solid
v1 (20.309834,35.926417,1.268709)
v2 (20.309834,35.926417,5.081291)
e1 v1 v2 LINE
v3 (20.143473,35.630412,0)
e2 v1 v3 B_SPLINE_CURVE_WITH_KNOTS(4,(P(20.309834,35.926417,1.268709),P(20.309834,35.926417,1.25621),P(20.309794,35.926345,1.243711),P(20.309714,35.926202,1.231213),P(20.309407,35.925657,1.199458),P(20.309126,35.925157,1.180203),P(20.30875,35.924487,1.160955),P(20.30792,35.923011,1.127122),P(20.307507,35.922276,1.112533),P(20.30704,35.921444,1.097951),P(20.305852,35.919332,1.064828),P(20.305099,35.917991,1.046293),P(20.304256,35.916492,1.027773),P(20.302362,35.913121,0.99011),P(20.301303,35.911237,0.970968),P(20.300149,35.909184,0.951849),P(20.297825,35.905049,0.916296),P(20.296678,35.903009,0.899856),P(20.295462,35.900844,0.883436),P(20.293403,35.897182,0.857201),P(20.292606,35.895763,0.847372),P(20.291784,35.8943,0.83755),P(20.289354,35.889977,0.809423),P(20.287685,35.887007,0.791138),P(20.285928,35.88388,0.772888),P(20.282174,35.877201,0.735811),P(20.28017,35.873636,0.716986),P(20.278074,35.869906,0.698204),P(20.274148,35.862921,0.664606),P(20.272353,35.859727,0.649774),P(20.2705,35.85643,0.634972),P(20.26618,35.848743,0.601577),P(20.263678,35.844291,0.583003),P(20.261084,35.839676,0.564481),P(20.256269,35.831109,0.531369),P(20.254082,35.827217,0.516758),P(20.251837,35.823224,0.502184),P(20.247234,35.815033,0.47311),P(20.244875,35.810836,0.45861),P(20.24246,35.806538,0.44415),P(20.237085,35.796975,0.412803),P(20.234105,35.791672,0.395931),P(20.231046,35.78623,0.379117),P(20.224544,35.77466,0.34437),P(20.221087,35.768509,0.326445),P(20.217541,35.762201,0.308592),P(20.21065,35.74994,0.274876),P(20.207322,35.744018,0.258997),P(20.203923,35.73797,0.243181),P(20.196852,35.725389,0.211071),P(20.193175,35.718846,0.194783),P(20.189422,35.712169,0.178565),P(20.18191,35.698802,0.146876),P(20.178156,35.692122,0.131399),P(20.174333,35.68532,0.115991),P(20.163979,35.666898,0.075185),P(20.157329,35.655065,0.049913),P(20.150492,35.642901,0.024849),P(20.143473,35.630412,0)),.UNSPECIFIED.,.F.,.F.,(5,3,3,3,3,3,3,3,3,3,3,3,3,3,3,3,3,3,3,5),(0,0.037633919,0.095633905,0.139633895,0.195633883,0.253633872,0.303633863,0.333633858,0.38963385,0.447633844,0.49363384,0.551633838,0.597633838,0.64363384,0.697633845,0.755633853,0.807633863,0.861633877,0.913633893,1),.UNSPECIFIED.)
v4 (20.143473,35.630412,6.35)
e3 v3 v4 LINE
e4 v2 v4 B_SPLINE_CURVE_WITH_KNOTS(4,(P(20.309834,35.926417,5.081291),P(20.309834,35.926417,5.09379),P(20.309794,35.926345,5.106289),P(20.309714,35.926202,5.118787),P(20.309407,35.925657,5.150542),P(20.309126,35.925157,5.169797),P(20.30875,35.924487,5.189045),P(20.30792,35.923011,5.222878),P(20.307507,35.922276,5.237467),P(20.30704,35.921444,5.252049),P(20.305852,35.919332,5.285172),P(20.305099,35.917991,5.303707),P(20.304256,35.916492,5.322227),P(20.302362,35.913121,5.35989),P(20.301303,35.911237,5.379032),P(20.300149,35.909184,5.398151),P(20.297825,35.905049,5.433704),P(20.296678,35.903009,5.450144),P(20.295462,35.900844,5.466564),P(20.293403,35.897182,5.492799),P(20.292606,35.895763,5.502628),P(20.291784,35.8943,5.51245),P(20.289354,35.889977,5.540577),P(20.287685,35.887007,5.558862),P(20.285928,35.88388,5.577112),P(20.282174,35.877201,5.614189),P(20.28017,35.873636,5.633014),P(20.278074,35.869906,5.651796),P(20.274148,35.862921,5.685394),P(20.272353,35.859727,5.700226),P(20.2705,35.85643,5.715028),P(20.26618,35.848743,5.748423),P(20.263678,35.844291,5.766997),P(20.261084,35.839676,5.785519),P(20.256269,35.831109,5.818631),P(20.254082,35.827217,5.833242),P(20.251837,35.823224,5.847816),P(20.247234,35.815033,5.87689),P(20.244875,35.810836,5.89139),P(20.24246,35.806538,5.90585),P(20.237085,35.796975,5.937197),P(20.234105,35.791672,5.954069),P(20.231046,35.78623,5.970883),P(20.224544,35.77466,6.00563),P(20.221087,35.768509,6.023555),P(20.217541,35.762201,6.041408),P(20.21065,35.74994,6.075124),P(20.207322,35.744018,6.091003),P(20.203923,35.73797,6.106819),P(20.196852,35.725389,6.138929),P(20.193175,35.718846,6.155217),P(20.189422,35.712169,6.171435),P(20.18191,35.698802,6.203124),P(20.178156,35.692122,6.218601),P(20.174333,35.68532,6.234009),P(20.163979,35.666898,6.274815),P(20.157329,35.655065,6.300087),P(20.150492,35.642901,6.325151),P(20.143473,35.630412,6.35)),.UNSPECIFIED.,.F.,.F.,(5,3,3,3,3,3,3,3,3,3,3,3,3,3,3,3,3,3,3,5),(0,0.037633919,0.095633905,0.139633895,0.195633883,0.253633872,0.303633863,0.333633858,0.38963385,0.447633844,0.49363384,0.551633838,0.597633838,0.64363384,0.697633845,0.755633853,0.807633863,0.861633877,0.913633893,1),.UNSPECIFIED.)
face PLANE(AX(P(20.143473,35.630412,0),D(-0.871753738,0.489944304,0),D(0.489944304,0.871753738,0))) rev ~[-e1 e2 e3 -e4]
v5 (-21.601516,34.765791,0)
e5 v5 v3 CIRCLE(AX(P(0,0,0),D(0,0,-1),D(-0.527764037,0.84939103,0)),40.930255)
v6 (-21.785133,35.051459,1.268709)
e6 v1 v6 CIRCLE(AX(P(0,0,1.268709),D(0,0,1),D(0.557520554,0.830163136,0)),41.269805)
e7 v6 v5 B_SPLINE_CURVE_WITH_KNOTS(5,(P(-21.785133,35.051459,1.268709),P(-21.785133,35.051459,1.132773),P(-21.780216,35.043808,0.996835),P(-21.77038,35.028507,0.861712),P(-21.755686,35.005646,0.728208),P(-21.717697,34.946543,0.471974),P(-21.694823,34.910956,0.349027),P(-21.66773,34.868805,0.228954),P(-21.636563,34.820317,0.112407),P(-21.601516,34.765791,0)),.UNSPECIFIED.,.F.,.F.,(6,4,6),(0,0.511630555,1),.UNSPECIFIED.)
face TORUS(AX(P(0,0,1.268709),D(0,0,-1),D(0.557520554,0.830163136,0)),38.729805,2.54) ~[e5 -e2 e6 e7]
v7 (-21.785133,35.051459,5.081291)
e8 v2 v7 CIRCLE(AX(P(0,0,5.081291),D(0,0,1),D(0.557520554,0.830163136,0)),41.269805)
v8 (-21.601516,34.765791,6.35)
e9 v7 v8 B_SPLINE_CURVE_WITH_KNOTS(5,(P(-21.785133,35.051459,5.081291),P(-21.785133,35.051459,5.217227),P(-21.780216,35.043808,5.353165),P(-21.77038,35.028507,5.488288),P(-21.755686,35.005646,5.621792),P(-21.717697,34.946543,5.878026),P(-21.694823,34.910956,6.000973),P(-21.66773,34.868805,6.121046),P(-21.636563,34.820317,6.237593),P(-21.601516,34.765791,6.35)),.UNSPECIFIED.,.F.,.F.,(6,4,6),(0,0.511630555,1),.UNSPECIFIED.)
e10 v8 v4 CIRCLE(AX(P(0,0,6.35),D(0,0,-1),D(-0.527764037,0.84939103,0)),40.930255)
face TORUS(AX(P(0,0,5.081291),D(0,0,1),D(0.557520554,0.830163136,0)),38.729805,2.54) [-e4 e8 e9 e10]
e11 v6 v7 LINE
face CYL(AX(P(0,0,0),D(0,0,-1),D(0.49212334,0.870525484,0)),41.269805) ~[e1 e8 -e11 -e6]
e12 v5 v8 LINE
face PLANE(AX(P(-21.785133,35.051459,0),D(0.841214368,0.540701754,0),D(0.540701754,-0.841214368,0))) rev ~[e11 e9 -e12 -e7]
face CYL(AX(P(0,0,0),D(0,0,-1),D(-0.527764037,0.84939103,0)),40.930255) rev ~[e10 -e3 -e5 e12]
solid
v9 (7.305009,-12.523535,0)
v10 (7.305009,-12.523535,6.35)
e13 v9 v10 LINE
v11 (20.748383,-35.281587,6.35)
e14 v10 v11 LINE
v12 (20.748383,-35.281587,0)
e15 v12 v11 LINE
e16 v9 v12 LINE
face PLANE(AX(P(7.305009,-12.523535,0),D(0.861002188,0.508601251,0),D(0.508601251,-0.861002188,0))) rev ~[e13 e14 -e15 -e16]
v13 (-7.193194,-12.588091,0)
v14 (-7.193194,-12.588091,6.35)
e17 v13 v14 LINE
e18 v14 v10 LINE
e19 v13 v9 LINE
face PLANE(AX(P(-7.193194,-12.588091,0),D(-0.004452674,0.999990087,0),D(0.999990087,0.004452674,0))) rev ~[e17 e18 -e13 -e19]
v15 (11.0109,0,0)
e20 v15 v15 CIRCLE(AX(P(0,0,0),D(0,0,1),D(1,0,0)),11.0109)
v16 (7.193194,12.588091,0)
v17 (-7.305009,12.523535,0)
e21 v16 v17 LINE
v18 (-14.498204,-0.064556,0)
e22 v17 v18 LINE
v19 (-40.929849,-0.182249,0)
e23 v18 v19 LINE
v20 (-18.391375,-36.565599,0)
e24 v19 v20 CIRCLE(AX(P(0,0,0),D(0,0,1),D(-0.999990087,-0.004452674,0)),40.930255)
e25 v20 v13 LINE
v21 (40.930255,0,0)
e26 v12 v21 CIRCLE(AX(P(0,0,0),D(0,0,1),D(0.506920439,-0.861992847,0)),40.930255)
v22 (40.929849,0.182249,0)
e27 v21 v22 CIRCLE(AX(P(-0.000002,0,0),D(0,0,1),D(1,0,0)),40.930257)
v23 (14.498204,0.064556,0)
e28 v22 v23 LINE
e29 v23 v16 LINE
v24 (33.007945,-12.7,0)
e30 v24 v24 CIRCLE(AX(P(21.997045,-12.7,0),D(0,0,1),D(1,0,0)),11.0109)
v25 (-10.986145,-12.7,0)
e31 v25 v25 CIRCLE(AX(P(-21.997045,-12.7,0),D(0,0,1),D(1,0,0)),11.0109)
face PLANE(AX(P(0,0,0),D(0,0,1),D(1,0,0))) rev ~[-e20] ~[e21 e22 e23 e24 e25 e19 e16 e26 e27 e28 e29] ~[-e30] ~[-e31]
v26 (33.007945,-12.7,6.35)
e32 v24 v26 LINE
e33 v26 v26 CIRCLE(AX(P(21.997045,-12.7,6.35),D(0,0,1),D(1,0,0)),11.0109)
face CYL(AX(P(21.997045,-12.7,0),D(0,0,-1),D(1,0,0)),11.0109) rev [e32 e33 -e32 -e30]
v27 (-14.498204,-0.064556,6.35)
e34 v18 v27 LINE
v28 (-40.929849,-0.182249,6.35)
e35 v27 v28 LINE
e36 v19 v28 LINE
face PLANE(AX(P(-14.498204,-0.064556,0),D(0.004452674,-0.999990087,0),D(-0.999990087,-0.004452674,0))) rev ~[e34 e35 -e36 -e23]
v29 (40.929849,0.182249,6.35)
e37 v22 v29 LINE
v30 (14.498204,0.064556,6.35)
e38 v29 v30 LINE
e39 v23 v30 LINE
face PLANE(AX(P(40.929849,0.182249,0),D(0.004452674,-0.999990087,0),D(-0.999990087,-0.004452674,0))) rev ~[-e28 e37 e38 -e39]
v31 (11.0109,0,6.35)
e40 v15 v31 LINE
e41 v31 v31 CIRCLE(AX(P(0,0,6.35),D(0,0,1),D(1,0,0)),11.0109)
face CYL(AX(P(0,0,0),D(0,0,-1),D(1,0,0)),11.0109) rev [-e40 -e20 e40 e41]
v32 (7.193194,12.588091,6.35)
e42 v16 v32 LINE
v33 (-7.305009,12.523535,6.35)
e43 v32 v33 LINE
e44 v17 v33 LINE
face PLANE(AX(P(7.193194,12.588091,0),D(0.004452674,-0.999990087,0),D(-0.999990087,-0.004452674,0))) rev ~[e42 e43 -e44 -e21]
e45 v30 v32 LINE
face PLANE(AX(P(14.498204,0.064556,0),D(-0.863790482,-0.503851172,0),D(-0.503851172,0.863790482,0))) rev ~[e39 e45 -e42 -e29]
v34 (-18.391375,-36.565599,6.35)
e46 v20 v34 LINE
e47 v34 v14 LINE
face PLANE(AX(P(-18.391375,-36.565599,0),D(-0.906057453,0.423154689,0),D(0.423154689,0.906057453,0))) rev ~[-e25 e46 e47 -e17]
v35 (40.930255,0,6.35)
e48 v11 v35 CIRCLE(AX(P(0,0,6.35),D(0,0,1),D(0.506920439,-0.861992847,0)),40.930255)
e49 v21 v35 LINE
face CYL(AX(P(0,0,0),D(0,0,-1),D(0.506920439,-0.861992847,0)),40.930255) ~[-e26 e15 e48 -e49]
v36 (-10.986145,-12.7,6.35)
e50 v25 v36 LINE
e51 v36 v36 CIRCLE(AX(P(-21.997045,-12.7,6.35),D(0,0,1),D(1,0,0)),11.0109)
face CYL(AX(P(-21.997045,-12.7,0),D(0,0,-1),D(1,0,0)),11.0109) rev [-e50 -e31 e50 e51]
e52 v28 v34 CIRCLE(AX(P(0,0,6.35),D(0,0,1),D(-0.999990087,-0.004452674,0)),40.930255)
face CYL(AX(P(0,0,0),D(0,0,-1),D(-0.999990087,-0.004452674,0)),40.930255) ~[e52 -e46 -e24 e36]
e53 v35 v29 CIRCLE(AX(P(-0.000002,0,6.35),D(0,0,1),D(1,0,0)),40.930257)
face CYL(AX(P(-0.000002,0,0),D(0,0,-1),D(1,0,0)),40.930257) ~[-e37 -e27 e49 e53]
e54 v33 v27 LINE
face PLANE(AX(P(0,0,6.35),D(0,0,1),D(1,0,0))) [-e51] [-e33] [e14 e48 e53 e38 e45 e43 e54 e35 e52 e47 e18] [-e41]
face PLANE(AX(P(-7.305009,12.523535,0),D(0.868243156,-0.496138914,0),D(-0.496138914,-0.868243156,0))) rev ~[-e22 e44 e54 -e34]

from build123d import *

# Parameters (mm, degrees)
F0_R        = 11.0109
F1_DEPTH    = 6.35
F2_T2_ANGLE = 70.1504817672
F2_T4_ANGLE = 70.1504817672


# Not quite as in the source:
# - a fillet or chamfer that OpenCascade refuses, or shapes differently, is made with other operations: its cross-section is extruded or revolved along the edge and cut away or added


with BuildPart() as f1:
    # F0 (on Top) → F1 (new body)
    with BuildSketch(Plane.XY):
        Polygon((14.4982038565, 0.0645564188), (7.1931944296, 12.5880910584), (-7.3050094269, 12.5235346396), (-14.4982038565, -0.0645564188), (-7.1931944296, -12.5880910584), (7.3050094269, -12.5235346396), align=None)
        Circle(F0_R, mode=Mode.SUBTRACT)
        with BuildLine():
            Line((-14.4982038565, -0.0645564188), (-40.9298487578, -0.1822490898))
            ThreePointArc((-40.9298487578, -0.1822490898), (-34.7949557319, -21.55450741), (-18.3913751147, -36.565599345))
            Line((-18.3913751147, -36.565599345), (-7.1931944296, -12.5880910584))
            Line((-7.1931944296, -12.5880910584), (-14.4982038565, -0.0645564188))
        make_face()
        with Locations((-21.9970452561, -12.7)):
            Circle(F0_R, mode=Mode.SUBTRACT)
        with BuildLine():
            ThreePointArc((40.9302545077, 0), (40.9301530701, 0.0911247708), (40.9298487578, 0.1822490898))
            Line((40.9298487578, 0.1822490898), (14.4982038565, 0.0645564188))
            Line((14.4982038565, 0.0645564188), (7.3050094269, -12.5235346396))
            Line((7.3050094269, -12.5235346396), (20.7483825964, -35.2815866098))
            ThreePointArc((20.7483825964, -35.2815866098), (35.5283148655, -20.3230060987), (40.9302545077, 0))
        make_face()
        with Locations((21.9970452561, -12.7)):
            Circle(F0_R, mode=Mode.SUBTRACT)
    extrude(amount=F1_DEPTH)


with BuildPart() as f1b:
    # F0 (on Top) → F1, piece 2 (new body)
    with BuildSketch(Plane.XY):
        with BuildLine():
            Line((20.1434729417, 35.6304116159), (20.3098342556, 35.9264168886))
            ThreePointArc((20.3098342556, 35.9264168886), (-0.8576214797, 41.2608929052), (-21.7851331782, 35.0514588904))
            Line((-21.7851331782, 35.0514588904), (-21.6015163476, 34.7657910244))
            ThreePointArc((-21.6015163476, 34.7657910244), (-0.8475640596, 40.921478092), (20.1434729417, 35.6304116159))
        make_face()
    extrude(amount=F1_DEPTH)

    # F2: fillet of radius 2.54 on 2 edges, made by hand

    # F2_s1 → F2_t2 (revolve, cut)
    with BuildSketch(Plane(origin=(0, 0, 0), x_dir=(0, 0, 1), z_dir=(0.8301631357, -0.5575205541, 0))):
        with BuildLine():
            ThreePointArc((1.2687086353, -41.2698049176), (0.6120283322, -41.1834493457), (0, -40.9302545077))
            Line((0, -40.9302545077), (0, -41.2698049176))
            Line((0, -41.2698049176), (1.2687086353, -41.2698049176))
        make_face()
    revolve(axis=Axis((0, 0, 0), (0, 0, 1)), revolution_arc=F2_T2_ANGLE, mode=Mode.SUBTRACT)

    # F2_s3 → F2_t4 (revolve, cut)
    with BuildSketch(Plane(origin=(0, 0, 0), x_dir=(0, 0, 1), z_dir=(0.8301631357, -0.5575205541, 0))):
        with BuildLine():
            ThreePointArc((5.0812913647, -41.2698049176), (5.7379716678, -41.1834493457), (6.35, -40.9302545077))
            Line((6.35, -40.9302545077), (6.35, -41.2698049176))
            Line((6.35, -41.2698049176), (5.0812913647, -41.2698049176))
        make_face()
    revolve(axis=Axis((0, 0, 6.35), (0, 0, 1)), revolution_arc=F2_T4_ANGLE, mode=Mode.SUBTRACT)


solid = Compound([f1.part, f1b.part])
